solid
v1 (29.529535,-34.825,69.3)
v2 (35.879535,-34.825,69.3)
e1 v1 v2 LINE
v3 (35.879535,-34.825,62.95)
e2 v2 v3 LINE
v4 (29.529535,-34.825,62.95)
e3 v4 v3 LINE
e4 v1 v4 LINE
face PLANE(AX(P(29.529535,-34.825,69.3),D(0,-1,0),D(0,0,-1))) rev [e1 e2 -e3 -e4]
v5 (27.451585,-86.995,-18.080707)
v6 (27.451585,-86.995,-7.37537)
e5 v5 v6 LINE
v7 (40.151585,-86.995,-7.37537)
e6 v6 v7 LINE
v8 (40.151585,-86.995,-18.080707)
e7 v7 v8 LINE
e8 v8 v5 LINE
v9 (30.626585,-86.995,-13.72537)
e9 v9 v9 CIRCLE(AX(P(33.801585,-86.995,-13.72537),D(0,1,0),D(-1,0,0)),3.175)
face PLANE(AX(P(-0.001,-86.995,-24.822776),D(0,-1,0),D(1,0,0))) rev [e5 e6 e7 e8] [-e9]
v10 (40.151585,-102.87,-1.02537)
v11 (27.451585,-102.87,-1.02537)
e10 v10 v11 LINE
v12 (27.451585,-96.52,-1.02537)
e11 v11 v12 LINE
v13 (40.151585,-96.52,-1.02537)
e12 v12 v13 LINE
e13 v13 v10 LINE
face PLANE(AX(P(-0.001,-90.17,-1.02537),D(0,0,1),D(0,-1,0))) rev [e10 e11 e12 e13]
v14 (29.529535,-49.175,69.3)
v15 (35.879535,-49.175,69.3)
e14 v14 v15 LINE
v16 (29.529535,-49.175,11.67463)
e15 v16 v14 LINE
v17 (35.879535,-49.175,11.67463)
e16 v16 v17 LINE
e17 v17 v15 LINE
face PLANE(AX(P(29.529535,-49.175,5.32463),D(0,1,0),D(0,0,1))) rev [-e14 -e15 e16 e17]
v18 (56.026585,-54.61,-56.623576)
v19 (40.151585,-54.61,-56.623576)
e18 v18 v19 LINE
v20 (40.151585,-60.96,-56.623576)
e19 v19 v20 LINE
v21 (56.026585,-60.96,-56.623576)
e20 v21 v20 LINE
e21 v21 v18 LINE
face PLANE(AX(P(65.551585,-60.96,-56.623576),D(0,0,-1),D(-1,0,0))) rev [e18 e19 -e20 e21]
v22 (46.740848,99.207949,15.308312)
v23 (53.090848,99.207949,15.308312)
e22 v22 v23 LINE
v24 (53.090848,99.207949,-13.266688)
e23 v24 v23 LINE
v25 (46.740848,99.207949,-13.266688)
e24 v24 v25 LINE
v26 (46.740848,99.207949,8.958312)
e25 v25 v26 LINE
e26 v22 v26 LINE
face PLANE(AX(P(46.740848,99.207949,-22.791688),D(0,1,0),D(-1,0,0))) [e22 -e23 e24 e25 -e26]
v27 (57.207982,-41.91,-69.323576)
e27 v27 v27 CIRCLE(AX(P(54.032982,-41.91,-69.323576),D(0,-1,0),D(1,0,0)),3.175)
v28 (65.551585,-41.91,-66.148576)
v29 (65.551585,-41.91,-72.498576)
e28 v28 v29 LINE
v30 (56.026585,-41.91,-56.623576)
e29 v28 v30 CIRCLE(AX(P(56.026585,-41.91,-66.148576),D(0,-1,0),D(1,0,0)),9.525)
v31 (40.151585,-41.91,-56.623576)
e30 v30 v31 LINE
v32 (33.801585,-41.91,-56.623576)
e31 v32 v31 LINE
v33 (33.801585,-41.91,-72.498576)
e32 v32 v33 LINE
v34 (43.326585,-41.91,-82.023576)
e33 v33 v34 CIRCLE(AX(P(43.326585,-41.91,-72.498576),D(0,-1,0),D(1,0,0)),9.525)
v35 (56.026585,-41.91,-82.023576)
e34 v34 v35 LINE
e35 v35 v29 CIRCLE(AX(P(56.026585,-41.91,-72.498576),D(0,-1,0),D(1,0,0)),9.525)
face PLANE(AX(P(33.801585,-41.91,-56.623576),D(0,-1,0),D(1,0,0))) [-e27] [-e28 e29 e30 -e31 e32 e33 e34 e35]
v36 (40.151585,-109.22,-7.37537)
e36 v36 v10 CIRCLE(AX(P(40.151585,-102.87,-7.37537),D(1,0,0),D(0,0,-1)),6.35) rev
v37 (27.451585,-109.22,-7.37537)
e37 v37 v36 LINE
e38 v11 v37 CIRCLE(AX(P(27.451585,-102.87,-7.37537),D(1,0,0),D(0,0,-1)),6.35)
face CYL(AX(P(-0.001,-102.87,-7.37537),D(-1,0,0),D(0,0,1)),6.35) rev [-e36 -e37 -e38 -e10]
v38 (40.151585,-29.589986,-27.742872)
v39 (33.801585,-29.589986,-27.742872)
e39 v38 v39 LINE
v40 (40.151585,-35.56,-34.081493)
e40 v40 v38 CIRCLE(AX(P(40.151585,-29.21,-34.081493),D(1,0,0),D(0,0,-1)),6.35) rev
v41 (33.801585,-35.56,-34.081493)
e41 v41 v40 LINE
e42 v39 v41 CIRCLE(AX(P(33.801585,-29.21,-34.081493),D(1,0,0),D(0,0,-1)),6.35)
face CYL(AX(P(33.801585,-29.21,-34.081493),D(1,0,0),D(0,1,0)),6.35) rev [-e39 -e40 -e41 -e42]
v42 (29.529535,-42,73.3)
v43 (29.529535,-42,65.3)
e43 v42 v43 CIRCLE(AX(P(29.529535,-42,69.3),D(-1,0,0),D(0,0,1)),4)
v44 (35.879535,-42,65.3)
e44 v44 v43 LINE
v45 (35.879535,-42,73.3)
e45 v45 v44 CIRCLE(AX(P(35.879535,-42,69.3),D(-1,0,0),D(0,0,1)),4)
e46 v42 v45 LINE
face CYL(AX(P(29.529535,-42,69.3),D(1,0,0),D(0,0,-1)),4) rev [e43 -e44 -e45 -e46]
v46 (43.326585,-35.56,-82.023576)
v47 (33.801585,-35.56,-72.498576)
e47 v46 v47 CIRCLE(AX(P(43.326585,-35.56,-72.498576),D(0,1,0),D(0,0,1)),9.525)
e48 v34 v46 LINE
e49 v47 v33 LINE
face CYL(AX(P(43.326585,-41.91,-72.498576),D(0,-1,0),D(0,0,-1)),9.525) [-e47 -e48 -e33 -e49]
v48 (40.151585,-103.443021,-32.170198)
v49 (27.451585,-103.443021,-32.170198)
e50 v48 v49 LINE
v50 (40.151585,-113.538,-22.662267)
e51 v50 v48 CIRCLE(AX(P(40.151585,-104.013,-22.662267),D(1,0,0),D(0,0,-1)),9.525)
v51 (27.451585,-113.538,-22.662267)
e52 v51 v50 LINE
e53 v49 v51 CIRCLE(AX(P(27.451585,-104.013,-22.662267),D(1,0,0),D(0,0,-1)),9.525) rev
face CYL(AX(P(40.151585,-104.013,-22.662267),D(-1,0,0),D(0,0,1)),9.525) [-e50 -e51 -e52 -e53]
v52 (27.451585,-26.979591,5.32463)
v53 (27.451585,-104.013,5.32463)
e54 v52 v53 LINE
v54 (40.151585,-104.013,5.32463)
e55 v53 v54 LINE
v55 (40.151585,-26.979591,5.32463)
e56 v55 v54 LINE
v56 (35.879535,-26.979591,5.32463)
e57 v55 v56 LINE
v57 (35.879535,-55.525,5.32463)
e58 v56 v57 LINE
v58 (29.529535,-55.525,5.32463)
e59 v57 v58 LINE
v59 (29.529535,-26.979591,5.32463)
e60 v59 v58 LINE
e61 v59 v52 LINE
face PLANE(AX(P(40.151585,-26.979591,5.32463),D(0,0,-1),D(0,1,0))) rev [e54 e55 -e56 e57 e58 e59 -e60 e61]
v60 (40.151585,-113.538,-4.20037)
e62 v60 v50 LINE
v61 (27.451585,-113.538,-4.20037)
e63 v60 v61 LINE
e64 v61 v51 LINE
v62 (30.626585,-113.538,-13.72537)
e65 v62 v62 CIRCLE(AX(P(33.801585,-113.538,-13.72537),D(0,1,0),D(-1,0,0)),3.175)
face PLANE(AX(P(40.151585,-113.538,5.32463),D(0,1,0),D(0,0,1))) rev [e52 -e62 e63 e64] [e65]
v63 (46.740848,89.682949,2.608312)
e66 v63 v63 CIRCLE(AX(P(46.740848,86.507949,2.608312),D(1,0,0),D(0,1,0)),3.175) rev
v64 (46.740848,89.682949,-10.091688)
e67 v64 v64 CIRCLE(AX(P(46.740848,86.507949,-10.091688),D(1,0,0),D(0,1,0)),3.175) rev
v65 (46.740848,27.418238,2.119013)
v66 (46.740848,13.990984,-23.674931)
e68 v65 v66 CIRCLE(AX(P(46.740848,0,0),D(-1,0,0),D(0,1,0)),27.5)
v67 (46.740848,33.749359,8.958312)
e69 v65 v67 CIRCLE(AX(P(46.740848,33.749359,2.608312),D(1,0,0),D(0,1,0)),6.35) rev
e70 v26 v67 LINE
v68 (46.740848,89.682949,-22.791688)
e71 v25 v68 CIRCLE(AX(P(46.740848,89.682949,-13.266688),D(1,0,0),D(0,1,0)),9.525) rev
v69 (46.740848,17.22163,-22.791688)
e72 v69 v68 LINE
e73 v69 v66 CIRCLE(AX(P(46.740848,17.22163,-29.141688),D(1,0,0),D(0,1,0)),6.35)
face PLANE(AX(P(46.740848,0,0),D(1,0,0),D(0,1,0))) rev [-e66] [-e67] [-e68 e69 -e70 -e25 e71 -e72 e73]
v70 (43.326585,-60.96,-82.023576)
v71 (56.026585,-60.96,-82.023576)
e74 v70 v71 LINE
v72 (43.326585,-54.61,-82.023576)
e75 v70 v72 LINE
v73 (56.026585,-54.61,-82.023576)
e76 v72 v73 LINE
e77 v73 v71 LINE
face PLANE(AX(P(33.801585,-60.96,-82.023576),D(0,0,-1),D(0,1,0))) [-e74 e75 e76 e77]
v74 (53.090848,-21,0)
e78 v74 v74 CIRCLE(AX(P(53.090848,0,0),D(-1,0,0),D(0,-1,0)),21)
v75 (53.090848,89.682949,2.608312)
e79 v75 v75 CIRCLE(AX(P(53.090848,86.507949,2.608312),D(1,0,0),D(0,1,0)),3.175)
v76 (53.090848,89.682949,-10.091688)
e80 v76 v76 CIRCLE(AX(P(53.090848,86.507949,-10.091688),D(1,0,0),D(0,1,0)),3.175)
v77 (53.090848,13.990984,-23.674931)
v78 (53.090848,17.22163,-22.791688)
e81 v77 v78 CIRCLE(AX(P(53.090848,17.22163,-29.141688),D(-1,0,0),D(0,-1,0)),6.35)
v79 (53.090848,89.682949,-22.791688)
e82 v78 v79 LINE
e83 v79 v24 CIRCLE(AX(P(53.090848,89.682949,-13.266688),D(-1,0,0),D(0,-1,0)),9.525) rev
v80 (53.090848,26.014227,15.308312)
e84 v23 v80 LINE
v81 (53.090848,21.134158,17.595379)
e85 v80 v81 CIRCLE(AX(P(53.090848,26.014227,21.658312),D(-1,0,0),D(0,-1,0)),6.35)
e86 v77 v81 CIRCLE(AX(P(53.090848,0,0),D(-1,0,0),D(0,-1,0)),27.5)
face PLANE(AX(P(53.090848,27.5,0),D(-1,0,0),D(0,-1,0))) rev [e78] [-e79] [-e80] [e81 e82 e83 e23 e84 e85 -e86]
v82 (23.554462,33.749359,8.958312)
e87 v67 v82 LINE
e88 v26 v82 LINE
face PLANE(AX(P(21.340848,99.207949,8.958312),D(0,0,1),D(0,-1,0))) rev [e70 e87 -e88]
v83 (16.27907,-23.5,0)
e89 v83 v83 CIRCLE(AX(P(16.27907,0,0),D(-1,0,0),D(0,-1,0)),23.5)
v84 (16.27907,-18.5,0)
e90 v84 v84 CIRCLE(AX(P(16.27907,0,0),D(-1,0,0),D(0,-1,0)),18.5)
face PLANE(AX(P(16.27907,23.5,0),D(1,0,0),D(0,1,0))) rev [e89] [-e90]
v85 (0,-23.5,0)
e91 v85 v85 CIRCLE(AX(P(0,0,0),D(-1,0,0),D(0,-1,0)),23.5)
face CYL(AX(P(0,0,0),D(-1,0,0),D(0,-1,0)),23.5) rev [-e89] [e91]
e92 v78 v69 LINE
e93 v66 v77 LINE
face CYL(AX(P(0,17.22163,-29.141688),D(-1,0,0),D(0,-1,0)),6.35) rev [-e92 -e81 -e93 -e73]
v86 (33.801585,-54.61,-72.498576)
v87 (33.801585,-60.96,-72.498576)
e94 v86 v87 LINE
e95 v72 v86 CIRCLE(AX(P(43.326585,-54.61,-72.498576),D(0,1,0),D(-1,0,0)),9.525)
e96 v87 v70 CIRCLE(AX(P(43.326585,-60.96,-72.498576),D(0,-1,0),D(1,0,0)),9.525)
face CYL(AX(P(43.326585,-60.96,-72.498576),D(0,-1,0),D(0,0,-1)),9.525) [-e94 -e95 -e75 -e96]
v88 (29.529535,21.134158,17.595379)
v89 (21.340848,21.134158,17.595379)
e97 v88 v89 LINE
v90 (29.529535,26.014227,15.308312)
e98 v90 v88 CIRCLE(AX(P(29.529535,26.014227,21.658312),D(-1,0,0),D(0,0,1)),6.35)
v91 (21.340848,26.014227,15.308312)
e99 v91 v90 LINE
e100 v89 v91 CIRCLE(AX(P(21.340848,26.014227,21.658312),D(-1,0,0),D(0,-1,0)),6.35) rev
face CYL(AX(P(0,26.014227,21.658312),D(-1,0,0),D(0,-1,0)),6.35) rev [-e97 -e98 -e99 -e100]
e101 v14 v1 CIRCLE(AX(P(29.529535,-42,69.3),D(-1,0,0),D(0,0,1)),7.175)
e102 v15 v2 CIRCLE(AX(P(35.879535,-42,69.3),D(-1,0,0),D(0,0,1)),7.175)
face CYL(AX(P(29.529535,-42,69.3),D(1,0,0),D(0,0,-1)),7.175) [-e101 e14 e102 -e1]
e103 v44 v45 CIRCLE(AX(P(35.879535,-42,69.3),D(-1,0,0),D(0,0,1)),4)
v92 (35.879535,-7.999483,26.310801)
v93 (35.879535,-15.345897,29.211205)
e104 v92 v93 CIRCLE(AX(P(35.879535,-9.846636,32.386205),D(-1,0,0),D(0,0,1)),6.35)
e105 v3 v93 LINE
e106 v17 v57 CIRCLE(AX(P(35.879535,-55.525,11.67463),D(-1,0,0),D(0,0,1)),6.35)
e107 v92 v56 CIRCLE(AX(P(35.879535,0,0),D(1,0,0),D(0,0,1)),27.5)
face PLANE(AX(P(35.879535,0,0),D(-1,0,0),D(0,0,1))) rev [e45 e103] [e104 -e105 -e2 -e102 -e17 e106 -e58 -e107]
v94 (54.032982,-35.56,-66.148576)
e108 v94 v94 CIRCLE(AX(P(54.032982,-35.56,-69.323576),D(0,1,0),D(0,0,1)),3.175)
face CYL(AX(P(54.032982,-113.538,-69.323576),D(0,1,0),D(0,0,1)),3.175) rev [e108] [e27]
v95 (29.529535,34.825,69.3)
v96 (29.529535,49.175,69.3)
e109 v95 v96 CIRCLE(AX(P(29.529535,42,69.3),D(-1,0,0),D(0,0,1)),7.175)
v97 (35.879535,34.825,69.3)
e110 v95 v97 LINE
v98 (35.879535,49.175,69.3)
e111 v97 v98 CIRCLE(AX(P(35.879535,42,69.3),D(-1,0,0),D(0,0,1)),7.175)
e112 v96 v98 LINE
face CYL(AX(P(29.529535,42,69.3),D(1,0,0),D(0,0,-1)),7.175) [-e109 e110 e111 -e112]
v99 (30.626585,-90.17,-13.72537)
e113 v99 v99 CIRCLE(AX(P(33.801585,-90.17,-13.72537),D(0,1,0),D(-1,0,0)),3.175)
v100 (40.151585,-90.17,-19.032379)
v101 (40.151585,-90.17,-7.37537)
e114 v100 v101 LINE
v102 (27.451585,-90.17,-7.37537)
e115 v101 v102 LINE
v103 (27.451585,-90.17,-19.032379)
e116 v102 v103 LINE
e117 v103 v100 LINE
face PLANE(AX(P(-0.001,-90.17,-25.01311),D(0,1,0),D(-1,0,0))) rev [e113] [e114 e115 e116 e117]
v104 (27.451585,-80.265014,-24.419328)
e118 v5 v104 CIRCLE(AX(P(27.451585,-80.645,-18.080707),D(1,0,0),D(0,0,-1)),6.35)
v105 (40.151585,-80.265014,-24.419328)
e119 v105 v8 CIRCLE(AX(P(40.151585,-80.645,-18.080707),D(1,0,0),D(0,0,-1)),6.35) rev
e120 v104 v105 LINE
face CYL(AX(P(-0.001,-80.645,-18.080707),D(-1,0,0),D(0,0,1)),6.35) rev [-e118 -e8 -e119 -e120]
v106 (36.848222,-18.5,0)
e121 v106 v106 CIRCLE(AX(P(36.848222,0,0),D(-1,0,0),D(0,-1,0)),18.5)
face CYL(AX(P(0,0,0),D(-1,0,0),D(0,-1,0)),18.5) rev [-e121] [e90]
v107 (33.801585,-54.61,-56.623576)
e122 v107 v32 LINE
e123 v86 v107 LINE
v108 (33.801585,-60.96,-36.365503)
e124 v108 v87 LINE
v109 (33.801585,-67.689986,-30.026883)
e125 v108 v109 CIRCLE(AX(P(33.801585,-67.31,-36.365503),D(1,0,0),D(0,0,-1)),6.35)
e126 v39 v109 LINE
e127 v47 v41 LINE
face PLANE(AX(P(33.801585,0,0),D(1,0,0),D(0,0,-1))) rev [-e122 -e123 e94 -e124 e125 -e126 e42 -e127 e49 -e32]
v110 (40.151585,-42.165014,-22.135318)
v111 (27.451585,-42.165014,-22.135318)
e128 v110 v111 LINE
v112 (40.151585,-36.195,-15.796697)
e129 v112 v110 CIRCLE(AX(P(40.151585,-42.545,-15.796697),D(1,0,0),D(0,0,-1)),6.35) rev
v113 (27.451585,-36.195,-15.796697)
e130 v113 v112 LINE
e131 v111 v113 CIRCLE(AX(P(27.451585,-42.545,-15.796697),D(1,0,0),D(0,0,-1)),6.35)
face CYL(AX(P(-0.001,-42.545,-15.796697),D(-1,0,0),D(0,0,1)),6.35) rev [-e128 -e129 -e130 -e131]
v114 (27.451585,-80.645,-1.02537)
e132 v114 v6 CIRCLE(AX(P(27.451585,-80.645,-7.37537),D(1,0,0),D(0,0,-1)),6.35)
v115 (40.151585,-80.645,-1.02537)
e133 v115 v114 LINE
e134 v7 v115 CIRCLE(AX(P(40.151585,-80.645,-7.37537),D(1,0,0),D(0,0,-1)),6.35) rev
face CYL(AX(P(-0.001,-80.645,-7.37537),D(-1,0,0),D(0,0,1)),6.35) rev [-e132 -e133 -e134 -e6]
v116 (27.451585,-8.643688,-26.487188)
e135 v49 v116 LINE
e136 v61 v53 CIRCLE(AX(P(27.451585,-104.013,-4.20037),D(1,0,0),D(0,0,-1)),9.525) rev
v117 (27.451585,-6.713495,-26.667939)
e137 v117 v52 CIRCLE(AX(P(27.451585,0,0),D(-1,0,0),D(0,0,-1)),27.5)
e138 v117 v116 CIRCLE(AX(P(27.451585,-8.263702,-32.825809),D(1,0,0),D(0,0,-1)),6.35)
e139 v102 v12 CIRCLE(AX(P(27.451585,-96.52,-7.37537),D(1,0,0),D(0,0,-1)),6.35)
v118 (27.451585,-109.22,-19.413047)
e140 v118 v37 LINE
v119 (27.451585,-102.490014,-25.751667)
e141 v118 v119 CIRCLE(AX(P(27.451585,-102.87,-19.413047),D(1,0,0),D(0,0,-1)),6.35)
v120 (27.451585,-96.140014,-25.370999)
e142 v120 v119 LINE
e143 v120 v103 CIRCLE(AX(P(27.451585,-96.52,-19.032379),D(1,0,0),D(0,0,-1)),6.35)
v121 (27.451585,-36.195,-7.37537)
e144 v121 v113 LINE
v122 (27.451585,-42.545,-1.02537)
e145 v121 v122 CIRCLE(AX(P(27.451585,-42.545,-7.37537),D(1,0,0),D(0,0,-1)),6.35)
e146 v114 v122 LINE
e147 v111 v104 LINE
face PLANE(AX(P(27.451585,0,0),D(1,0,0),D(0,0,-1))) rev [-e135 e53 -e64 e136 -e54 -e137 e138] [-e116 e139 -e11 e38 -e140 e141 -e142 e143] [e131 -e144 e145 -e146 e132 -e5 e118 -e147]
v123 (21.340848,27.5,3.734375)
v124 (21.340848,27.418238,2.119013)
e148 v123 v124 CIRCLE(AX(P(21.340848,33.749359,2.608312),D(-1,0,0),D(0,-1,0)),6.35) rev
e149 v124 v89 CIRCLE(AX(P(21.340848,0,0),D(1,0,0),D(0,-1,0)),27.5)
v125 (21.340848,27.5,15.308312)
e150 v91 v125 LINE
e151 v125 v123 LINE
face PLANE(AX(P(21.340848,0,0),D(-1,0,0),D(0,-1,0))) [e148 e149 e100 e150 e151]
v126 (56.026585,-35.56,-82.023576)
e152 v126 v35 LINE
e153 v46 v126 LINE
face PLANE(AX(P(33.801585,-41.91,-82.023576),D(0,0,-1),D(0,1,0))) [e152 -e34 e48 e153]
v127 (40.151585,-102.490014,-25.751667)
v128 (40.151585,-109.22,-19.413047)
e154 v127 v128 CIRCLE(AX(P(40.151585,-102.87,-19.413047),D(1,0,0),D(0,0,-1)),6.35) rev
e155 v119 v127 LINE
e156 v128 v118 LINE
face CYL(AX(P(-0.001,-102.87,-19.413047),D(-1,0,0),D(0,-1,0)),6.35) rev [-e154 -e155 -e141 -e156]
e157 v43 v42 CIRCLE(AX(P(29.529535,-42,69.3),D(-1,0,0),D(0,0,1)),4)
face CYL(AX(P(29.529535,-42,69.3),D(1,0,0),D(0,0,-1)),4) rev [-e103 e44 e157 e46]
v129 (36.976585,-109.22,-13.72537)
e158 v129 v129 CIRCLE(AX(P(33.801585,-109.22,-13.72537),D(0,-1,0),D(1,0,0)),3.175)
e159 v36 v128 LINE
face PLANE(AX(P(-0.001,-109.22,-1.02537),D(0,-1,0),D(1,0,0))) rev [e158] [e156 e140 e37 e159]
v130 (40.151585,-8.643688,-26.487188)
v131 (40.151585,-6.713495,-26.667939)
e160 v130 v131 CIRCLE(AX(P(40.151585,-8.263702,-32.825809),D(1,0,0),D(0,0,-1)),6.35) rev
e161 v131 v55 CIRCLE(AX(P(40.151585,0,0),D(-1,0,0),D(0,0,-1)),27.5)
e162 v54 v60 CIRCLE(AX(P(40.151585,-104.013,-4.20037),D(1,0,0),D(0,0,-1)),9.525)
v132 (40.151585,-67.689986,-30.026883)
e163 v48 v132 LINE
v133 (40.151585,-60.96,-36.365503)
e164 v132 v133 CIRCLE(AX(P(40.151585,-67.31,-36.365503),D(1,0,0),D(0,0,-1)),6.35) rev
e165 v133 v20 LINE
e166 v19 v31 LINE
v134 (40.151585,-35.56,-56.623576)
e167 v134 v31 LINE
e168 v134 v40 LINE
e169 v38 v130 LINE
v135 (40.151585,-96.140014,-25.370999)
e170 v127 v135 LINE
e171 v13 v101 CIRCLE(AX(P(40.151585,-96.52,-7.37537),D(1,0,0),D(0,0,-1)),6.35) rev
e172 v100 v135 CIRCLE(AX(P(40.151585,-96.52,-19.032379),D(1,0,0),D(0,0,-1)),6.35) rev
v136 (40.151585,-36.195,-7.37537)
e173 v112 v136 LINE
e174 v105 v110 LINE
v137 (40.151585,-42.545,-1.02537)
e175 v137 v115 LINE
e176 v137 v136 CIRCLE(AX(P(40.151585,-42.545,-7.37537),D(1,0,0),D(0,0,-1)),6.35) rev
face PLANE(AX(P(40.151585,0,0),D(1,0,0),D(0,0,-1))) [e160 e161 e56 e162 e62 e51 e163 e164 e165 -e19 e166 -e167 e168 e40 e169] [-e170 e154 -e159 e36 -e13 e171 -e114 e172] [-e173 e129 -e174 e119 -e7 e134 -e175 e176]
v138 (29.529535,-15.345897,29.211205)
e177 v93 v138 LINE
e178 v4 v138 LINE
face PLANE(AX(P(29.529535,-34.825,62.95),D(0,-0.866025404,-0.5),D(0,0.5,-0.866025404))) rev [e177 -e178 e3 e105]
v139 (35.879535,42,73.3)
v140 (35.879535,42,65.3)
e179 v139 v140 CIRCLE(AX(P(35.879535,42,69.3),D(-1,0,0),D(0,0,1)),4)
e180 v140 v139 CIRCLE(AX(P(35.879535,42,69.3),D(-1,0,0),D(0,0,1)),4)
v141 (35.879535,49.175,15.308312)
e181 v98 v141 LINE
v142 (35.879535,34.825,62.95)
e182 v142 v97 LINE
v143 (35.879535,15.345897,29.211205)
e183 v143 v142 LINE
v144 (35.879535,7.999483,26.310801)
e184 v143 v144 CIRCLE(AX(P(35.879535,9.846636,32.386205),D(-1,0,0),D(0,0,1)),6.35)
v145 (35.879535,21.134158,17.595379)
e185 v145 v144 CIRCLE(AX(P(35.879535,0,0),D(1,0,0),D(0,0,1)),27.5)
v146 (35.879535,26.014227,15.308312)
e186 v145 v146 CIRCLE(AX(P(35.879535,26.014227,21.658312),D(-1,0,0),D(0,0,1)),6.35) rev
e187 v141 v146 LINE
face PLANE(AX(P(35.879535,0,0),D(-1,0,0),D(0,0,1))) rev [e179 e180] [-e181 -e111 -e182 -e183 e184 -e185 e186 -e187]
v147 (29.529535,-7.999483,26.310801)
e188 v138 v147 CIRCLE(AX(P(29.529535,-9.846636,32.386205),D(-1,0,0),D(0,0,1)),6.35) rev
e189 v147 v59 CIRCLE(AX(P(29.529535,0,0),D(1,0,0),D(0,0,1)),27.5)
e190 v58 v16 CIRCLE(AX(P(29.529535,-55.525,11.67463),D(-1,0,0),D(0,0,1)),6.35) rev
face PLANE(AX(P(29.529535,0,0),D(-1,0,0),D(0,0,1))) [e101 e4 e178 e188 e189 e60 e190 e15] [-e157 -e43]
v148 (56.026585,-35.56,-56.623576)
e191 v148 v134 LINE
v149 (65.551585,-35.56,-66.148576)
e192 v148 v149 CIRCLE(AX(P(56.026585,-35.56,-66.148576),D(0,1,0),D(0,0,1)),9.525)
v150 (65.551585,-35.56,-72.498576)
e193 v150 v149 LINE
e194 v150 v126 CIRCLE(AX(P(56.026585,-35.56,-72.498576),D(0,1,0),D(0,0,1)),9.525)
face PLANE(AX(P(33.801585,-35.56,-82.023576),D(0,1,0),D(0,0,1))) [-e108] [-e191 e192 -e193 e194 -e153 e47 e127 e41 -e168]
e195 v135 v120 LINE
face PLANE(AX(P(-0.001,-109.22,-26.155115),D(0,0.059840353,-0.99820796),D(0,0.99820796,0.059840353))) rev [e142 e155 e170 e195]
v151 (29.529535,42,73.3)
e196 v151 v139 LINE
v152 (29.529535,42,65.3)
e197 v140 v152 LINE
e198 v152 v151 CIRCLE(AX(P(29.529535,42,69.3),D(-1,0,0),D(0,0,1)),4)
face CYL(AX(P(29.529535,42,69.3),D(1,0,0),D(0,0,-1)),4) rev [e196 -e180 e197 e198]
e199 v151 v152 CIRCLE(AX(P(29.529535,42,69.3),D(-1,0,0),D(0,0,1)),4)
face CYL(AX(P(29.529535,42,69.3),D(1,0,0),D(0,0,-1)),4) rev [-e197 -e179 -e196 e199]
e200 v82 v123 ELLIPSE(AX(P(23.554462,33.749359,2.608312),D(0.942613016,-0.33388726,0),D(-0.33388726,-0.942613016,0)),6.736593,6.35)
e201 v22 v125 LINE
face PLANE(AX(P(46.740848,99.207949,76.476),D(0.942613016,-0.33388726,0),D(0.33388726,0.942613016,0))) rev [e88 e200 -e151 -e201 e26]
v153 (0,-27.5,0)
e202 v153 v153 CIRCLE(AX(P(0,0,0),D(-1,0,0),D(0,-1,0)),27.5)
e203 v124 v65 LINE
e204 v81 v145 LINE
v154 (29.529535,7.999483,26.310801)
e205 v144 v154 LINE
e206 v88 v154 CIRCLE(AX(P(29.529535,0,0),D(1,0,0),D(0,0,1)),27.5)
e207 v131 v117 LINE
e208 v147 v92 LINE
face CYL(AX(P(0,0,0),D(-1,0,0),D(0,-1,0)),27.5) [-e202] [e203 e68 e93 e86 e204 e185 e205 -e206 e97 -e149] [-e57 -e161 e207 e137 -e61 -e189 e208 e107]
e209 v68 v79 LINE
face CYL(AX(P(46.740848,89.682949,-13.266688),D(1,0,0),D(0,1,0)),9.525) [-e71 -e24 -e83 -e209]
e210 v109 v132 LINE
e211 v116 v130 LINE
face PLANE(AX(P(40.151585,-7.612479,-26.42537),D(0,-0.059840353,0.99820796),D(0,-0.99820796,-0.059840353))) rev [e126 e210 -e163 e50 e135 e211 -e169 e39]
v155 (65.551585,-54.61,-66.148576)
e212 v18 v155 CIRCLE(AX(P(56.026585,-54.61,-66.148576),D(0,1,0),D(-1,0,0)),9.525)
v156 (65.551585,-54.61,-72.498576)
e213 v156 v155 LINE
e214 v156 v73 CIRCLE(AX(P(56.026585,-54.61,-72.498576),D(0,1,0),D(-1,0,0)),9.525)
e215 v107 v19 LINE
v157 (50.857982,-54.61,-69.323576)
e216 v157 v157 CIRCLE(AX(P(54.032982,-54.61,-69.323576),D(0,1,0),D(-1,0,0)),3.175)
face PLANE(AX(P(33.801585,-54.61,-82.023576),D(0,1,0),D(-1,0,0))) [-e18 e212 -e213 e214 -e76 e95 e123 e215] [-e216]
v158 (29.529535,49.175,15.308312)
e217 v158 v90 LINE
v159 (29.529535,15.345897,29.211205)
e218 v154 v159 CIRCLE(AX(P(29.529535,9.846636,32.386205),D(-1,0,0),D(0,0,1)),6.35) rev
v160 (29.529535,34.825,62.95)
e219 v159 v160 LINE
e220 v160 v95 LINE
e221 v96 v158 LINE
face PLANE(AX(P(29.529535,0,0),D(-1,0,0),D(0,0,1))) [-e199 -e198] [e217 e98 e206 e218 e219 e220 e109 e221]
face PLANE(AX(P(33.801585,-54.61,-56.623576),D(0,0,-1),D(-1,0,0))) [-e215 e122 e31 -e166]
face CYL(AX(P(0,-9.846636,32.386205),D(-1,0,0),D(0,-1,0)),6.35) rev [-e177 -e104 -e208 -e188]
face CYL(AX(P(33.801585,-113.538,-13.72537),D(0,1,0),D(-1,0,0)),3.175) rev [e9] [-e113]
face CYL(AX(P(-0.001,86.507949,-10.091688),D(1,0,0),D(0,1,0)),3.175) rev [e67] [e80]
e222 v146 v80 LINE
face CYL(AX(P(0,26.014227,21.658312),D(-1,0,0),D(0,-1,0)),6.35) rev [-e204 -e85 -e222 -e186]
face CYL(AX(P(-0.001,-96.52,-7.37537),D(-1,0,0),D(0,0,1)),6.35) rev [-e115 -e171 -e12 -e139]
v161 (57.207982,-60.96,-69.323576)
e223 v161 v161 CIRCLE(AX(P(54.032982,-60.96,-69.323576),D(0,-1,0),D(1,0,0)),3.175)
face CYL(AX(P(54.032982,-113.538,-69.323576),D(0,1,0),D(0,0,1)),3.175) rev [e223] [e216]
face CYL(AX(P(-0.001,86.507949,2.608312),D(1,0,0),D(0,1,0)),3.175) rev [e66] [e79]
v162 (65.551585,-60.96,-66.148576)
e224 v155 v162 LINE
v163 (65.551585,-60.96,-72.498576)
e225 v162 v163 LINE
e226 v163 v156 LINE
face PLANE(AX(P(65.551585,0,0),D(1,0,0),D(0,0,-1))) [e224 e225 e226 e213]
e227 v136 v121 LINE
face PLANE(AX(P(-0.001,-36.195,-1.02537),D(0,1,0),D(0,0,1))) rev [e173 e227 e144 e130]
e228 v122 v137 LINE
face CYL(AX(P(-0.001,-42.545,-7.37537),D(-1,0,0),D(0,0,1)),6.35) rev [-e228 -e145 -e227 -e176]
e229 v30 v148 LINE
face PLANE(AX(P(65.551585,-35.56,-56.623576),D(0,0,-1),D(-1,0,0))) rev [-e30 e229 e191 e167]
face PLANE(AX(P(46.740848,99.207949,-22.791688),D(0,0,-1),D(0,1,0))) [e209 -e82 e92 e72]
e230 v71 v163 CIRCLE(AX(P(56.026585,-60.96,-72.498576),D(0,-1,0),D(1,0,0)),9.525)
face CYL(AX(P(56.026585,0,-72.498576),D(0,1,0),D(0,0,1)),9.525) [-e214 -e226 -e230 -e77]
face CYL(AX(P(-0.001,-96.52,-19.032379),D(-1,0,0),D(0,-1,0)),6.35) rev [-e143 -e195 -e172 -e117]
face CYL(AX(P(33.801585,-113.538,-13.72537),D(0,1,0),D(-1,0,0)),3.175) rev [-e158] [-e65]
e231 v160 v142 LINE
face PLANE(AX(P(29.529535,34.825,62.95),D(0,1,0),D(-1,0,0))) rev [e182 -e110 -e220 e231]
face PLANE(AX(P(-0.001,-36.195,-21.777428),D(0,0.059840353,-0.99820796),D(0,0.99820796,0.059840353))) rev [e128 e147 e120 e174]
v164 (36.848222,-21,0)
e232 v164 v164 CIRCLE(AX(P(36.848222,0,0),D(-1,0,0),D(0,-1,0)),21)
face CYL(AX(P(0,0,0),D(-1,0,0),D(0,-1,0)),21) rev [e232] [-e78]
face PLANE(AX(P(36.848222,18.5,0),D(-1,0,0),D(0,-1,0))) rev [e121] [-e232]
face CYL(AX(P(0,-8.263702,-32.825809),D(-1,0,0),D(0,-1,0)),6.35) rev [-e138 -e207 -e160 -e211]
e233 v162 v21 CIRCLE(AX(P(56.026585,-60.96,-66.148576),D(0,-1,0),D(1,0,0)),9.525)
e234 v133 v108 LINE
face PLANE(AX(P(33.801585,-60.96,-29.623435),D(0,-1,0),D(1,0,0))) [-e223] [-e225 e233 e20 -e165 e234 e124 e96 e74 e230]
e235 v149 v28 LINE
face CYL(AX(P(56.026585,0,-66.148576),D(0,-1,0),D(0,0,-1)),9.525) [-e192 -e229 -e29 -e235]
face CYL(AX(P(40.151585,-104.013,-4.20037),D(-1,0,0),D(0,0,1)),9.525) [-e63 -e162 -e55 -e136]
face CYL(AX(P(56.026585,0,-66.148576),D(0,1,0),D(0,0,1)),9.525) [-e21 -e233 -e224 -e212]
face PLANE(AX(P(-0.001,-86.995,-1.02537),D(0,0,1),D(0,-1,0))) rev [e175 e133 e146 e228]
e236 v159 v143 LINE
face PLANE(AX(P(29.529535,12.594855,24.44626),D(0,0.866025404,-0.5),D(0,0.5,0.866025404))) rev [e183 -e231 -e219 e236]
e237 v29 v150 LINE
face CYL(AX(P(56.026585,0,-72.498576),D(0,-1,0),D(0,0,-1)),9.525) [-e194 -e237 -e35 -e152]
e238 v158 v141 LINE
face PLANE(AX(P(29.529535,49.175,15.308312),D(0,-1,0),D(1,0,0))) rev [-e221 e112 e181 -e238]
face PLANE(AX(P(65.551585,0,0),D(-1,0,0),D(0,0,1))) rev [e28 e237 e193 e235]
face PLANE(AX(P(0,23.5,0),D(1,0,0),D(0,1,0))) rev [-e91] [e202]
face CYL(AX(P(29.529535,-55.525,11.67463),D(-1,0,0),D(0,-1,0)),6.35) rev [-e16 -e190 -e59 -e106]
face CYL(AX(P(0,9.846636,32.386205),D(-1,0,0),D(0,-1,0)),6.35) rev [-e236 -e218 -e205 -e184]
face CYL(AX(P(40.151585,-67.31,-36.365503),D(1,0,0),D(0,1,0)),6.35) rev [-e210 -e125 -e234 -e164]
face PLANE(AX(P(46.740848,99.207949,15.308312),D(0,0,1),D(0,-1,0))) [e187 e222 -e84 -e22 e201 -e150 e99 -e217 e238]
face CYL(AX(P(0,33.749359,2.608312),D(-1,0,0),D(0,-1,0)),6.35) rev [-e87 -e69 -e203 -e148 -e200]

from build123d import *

# Parameters (mm, degrees)
BOSS_EXTRUDE1_START      = -6.35
BOSS_EXTRUDE1_DEPTH      = 6.35
BOSS_EXTRUDE2_DEPTH      = 6.35
BOSS_EXTRUDE2_DEPTH_BACK = 6.35
BOSS_EXTRUDE3_DEPTH      = 6.35
SKETCH6_W                = 25.4
SKETCH6_H                = 6.35
BOSS_EXTRUDE4_DEPTH      = 25.4
BOSS_EXTRUDE5_START      = 25.4
BOSS_EXTRUDE5_DEPTH      = 25.4
BOSS_EXTRUDE6_START      = 6.35
BOSS_EXTRUDE6_DEPTH      = 6.35
CUT_EXTRUDE1_REACH       = 161.579
CUT_EXTRUDE2_REACH       = 147.708
SKETCH14_R               = 3.175
CUT_EXTRUDE3_DEPTH       = 214.767199478
CUT_EXTRUDE4_REACH       = 151.791
SKETCH15_R               = 3.175
SKETCH16_R               = 3.175
CUT_EXTRUDE5_DEPTH       = 171.84284427
BOSS_EXTRUDE7_START      = 6.35
BOSS_EXTRUDE7_DEPTH      = 6.35
F_0_375_FILLET1_R        = 9.525
F_0_25_FILLET1_R         = 6.35


with BuildPart() as part:
    # Sketch1 → Revolve1 (revolve)
    with BuildSketch(Plane.XY, mode=Mode.PRIVATE) as revolve1_sk:
        Polygon((0, 23.5), (16.279070312, 23.5), (16.279070312, 18.5), (36.848222468, 18.5), (36.848222468, 21), (53.090847844, 21), (53.090847844, 27.5), (0, 27.5), align=None)
    revolve(revolve1_sk.sketch.rotate(Axis((0, 0, 0), (1, 0, 0)), 180), axis=Axis((0, 0, 0), (1, 0, 0)))

    # Sketch2 → Boss-Extrude1 (add)
    with BuildSketch(Plane(origin=(53.090847844, 0, 0), x_dir=(0, 0, -1), z_dir=(1, 0, 0)).offset(BOSS_EXTRUDE1_START)):
        with BuildLine():
            Line((22.791687671, 99.207948957), (22.791687671, 15.387948957))
            ThreePointArc((22.791687671, 15.387948957), (5.282335812, 26.987903371), (-15.308312329, 22.84525276))
            Line((-15.308312329, 22.84525276), (-15.308312329, 99.207948957))
            Line((-15.308312329, 99.207948957), (22.791687671, 99.207948957))
        make_face()
    extrude(amount=BOSS_EXTRUDE1_DEPTH)

    # Sketch4 → Boss-Extrude2 (add, two sides: drawn at the far end of the back side and taken through both)
    with BuildSketch(Plane(origin=(33.801584976, 0, 0), x_dir=(0, 0, -1), z_dir=(1, 0, 0)).offset(-BOSS_EXTRUDE2_DEPTH_BACK)):
        with BuildLine():
            Line((26.425369625, -7.612479241), (32.775369625, -113.538))
            Line((32.775369625, -113.538), (-5.324630375, -113.538))
            Line((-5.324630375, -113.538), (-5.324630375, -26.979590645))
            ThreePointArc((-5.324630375, -26.979590645), (14.320668639, -23.476977015), (26.425369625, -7.612479241))
        make_face()
    extrude(amount=BOSS_EXTRUDE2_DEPTH + BOSS_EXTRUDE2_DEPTH_BACK)

    # Sketch5 → Boss-Extrude3 (add)
    with BuildSketch(Plane(origin=(40.151584976, 0, 0), x_dir=(0, 0, -1), z_dir=(1, 0, 0))):
        Polygon((29.623435156, -60.96), (82.023576364, -60.96), (82.023576364, -54.61), (56.623576364, -54.61), (56.623576364, -41.91), (82.023576364, -41.91), (82.023576364, -35.56), (28.1007615, -35.56), align=None)
    extrude(amount=-BOSS_EXTRUDE3_DEPTH)

    # Sketch6 → Boss-Extrude4 (add)
    with BuildSketch(Plane(origin=(40.151584976, 0, 0), x_dir=(0, 0, -1), z_dir=(1, 0, 0))):
        with Locations((69.323576364, -38.735)):
            Rectangle(SKETCH6_W, SKETCH6_H)
        with Locations((69.323576364, -57.785)):
            Rectangle(SKETCH6_W, SKETCH6_H)
    extrude(amount=BOSS_EXTRUDE4_DEPTH)

    # Sketch7 → Boss-Extrude5 (add)
    with BuildSketch(Plane.ZY.offset(-46.740847844).offset(BOSS_EXTRUDE5_START)):
        with BuildLine():
            Line((15.308312329, 22.84525276), (15.308312329, 99.207948957))
            Line((15.308312329, 99.207948957), (8.958312329, 99.207948957))
            Line((8.958312329, 99.207948957), (8.958312329, 25.99997385))
            ThreePointArc((8.958312329, 25.99997385), (12.235413126, 24.62812753), (15.308312329, 22.84525276))
        make_face()
    extrude(amount=-BOSS_EXTRUDE5_DEPTH)

    # Sketch8 → Boss-Extrude6 (add)
    with BuildSketch(Plane.ZY.offset(-35.879535156).offset(BOSS_EXTRUDE6_START)):
        with BuildLine():
            Line((15.308312329, 49.175), (69.3, 49.175))
            ThreePointArc((69.3, 49.175), (76.475, 42), (69.3, 34.825))
            Line((69.3, 34.825), (62.95, 34.825))
            Line((62.95, 34.825), (24.446259855, 12.594855263))
            ThreePointArc((24.446259855, 12.594855263), (20.527400337, 18.299612985), (15.308312329, 22.84525276))
            Line((15.308312329, 22.84525276), (15.308312329, 49.175))
        make_face()
        with BuildLine():
            ThreePointArc((69.3, 38.000000001), (73.299999999, 42), (69.3, 46.000000001))
            ThreePointArc((69.3, 46.000000001), (65.299999999, 42), (69.3, 38.000000001))
        make_face(mode=Mode.SUBTRACT)
    extrude(amount=-BOSS_EXTRUDE6_DEPTH)

    # Sketch10 → Cut-Extrude1 (cut, up to next)
    with BuildSketch(Plane(origin=(0, 0, 8.958312329), x_dir=(-1, 0, 0), z_dir=(0, 0, -1)), mode=Mode.PRIVATE) as cut_extrude1_sk1:
        Polygon((-46.740847844, 99.207948957), (-21.340847844, 27.5), (-21.340847844, 99.207948957), align=None)
    cut_extrude1_tool1 = extrude(cut_extrude1_sk1.sketch, amount=-CUT_EXTRUDE1_REACH, mode=Mode.PRIVATE) & part.part
    add(cut_extrude1_tool1.solids().sort_by_distance((29.807515, 75.305299, 8.958312))[0], mode=Mode.SUBTRACT)

    # Sketch13 → Cut-Extrude2 (cut, up to next)
    with BuildSketch(Plane(origin=(40.151584976, 0, 0), x_dir=(0, 0, -1), z_dir=(1, 0, 0)), mode=Mode.PRIVATE) as cut_extrude2_sk1:
        Polygon((26.155115223, -109.22), (25.01310998, -90.17), (1.025369625, -90.17), (1.025369625, -109.22), align=None)
    cut_extrude2_tool1 = extrude(cut_extrude2_sk1.sketch, amount=-CUT_EXTRUDE2_REACH, mode=Mode.PRIVATE) & part.part
    # Sketch13 → Cut-Extrude2 (cut, up to next)
    with BuildSketch(Plane(origin=(40.151584976, 0, 0), x_dir=(0, 0, -1), z_dir=(1, 0, 0)), mode=Mode.PRIVATE) as cut_extrude2_sk2:
        Polygon((21.77742846, -36.195), (24.822775773, -86.995), (1.025369625, -86.995), (1.025369625, -36.195), align=None)
    cut_extrude2_tool2 = extrude(cut_extrude2_sk2.sketch, amount=-CUT_EXTRUDE2_REACH, mode=Mode.PRIVATE) & part.part
    add(cut_extrude2_tool1.solids().sort_by_distance((40.151585, -99.76882, -13.306954))[0], mode=Mode.SUBTRACT)
    add(cut_extrude2_tool2.solids().sort_by_distance((40.151585, -62.173771, -12.180084))[0], mode=Mode.SUBTRACT)

    # Sketch14 → Cut-Extrude3 (cut, through all)
    with BuildSketch(Plane(origin=(0, -86.995, 0), x_dir=(1, 0, 0), z_dir=(0, 1, 0))):
        with Locations(Location((33.801584976, 13.725369625, 0), (0, 0, 180))):
            Circle(SKETCH14_R)
    extrude(amount=-CUT_EXTRUDE3_DEPTH, mode=Mode.SUBTRACT)

    # Sketch15 → Cut-Extrude4 (cut, up to next)
    with BuildSketch(Plane(origin=(53.090847844, 0, 0), x_dir=(0, 0, -1), z_dir=(1, 0, 0)), mode=Mode.PRIVATE) as cut_extrude4_sk1:
        with Locations(Location((-2.608312329, 86.507948957, 0), (0, 0, 90))):
            Circle(SKETCH15_R)
    cut_extrude4_tool1 = extrude(cut_extrude4_sk1.sketch, amount=-CUT_EXTRUDE4_REACH, mode=Mode.PRIVATE) & part.part
    # Sketch15 → Cut-Extrude4 (cut, up to next)
    with BuildSketch(Plane(origin=(53.090847844, 0, 0), x_dir=(0, 0, -1), z_dir=(1, 0, 0)), mode=Mode.PRIVATE) as cut_extrude4_sk2:
        with Locations(Location((10.091687671, 86.507948957, 0), (0, 0, 90))):
            Circle(SKETCH15_R)
    cut_extrude4_tool2 = extrude(cut_extrude4_sk2.sketch, amount=-CUT_EXTRUDE4_REACH, mode=Mode.PRIVATE) & part.part
    add(cut_extrude4_tool1.solids().sort_by_distance((53.090848, 86.507949, 2.608312))[0], mode=Mode.SUBTRACT)
    add(cut_extrude4_tool2.solids().sort_by_distance((53.090848, 86.507949, -10.091688))[0], mode=Mode.SUBTRACT)

    # Sketch16 → Cut-Extrude5 (cut, through all)
    with BuildSketch(Plane(origin=(0, -35.56, 0), x_dir=(1, 0, 0), z_dir=(0, 1, 0))):
        with Locations(Location((54.032981596, 69.323576364, 0), (0, 0, 180))):
            Circle(SKETCH16_R)
    extrude(amount=-CUT_EXTRUDE5_DEPTH, mode=Mode.SUBTRACT)

    # Sketch9 → Boss-Extrude7 (add)
    with BuildSketch(Plane.ZY.offset(-35.879535156).offset(BOSS_EXTRUDE7_START)):
        with BuildLine():
            Line((5.324630375, -49.174999998), (69.3, -49.174999998))
            ThreePointArc((69.3, -49.174999998), (76.474999998, -42), (69.3, -34.825000002))
            Line((69.3, -34.825000002), (62.95, -34.825000002))
            Line((62.95, -34.825000002), (24.446259854, -12.594855264))
            ThreePointArc((24.446259854, -12.594855264), (16.531988061, -21.975972578), (5.324630375, -26.979590645))
            Line((5.324630375, -26.979590645), (5.324630375, -49.174999998))
        make_face()
        with BuildLine():
            ThreePointArc((69.3, -46.000000001), (73.300000001, -42), (69.3, -38.000000001))
            ThreePointArc((69.3, -38.000000001), (65.300000001, -42), (69.3, -46.000000001))
        make_face(mode=Mode.SUBTRACT)
    extrude(amount=-BOSS_EXTRUDE7_DEPTH)

    # 0.375 Fillet1
    f_0_375_fillet1_edges = [part.edges().sort_by_distance(p)[0] for p in [
        (49.915847844, 99.207948957, -22.791687671),
        (33.801584976, -113.538, 5.324630375),
        (33.801584976, -113.538, -32.775369625),
        (33.801584976, -38.735, -82.023576364),
        (33.801584976, -57.785, -82.023576364),
        (65.551584976, -38.735, -82.023576364),
        (65.551584976, -38.735, -56.623576364),
        (65.551584976, -57.785, -82.023576364),
        (65.551584976, -57.785, -56.623576364),
    ]]
    fillet(f_0_375_fillet1_edges, radius=F_0_375_FILLET1_R)

    # 0.25 Fillet1
    # the kernel refuses this fillet: 6.35 mm, written as the material it adds along each edge
    with BuildSketch(Plane(origin=(40.151584976, -60.96, -29.623435156), x_dir=(0, -0.9982079603765488, -0.05984035294757458), z_dir=(-1, 0, 0))) as f_0_25_fillet1_piece_1:
        with BuildLine():
            CenterArc((F_0_25_FILLET1_R * 1.06174303854, -F_0_25_FILLET1_R), F_0_25_FILLET1_R, 90, 93.4306492)
            Line((F_0_25_FILLET1_R * 0.063535078166, -F_0_25_FILLET1_R * 1.05984035295), (0, 0))
            Line((0, 0), (F_0_25_FILLET1_R * 1.06174303854, 0))
        make_face()
    extrude(amount=6.35)
    with BuildSketch(Plane(origin=(40.151584976, -35.56, -28.1007615), x_dir=(0, 0.9982079603765489, 0.05984035294757479), z_dir=(-1, 0, 0))) as f_0_25_fillet1_piece_2:
        with BuildLine():
            CenterArc((F_0_25_FILLET1_R * 0.941847475047, F_0_25_FILLET1_R), F_0_25_FILLET1_R, 183.4306492, 86.5693508)
            Line((-F_0_25_FILLET1_R * 0.0563604853296, F_0_25_FILLET1_R * 0.940159647052), (0, 0))
            Line((0, 0), (F_0_25_FILLET1_R * 0.941847475047, 0))
        make_face()
    extrude(amount=6.35)
    with BuildSketch(Plane(origin=(21.340847844, 25.99997385, 8.958312329), x_dir=(0, 0.20304997506833786, -0.9791683755232026), z_dir=(1, 0, 0))) as f_0_25_fillet1_piece_3_section:
        with BuildLine():
            CenterArc((7.791231567, 6.298585148), F_0_25_FILLET1_R, 168.284629793, 94.419307905)
            Line((1.573512383, 7.587952489), (0, 0))
            ThreePointArc((0, 0), (3.492402088, 0.222662746), (6.984804176, 0))
        make_face()
    f_0_25_fillet1_piece_3 = extrude(amount=25.4, mode=Mode.PRIVATE)
    f_0_25_fillet1_piece_3 = split(f_0_25_fillet1_piece_3, bisect_by=Plane(origin=(23.013997024, 32.223547088, 7.374495309), z_dir=(0.9426130158079032, -0.33388726005873554, 0)), keep=Keep.TOP, mode=Mode.PRIVATE)
    add(f_0_25_fillet1_piece_3)
    with BuildSketch(Plane(origin=(27.451584976, -7.612479241, -26.425369625), x_dir=(0, 0.9654712583471962, -0.26050959541921204), z_dir=(1, 0, 0))) as f_0_25_fillet1_piece_4:
        with BuildLine():
            CenterArc((1.038638906, -6.34908993), F_0_25_FILLET1_R, 90.970048392, 17.560902681)
            Line((-0.979498363, -0.328324035), (0, 0))
            ThreePointArc((0, 0), (0.465567562, -0.003941249), (0.931135124, 0))
        make_face()
    extrude(amount=12.7)
    with BuildSketch(Plane(origin=(46.740847844, 15.387948957, -22.791687671), x_dir=(0, 1, 0), z_dir=(1, 0, 0))) as f_0_25_fillet1_piece_5:
        with BuildLine():
            CenterArc((1.833681038, -6.35), F_0_25_FILLET1_R, 90, 30.581473676)
            ThreePointArc((-1.396964471, -0.883243229), (-0.691845316, -0.452118768), (0, 0))
            Line((0, 0), (1.833681038, 0))
        make_face()
    extrude(amount=6.35)
    with BuildSketch(Plane(origin=(53.090847844, 22.84525276, 15.308312329), x_dir=(0, -0.5990573223008322, 0.8007061412264532), z_dir=(-1, 0, 0))) as f_0_25_fillet1_piece_6:
        with BuildLine():
            CenterArc((3.186086766, 6.341431143), F_0_25_FILLET1_R, 216.80241312, 50.220708616)
            Line((-1.898397231, 2.537417146), (0, 0))
            ThreePointArc((0, 0), (1.428156252, 0.037109225), (2.856312504, 0))
        make_face()
    extrude(amount=25.133748321)
    with BuildSketch(Plane(origin=(37.451970789, 22.84525276, 15.308312329), x_dir=(0, -0.5990573223008359, 0.8007061412264505), z_dir=(-1, 0, 0))) as f_0_25_fillet1_piece_7:
        with BuildLine():
            CenterArc((3.186086766, 6.341431143), F_0_25_FILLET1_R, 216.80241312, 50.220708616)
            Line((-1.898397231, 2.537417146), (0, 0))
            ThreePointArc((0, 0), (1.428156252, 0.037109225), (2.856312504, 0))
        make_face()
    extrude(amount=16.111122945)
    with BuildSketch(Plane(origin=(29.529535156, 12.594855263, 24.446259855), x_dir=(0, -0.9266302092337214, 0.3759740088562898), z_dir=(1, 0, 0))) as f_0_25_fillet1_piece_8:
        with BuildLine():
            CenterArc((5.531795752, -6.32413382), F_0_25_FILLET1_R, 95.173261718, 76.911263608)
            Line((-0.757703388, -5.449662227), (0, 0))
            ThreePointArc((0, 0), (2.479615048, -0.112018891), (4.959230096, 0))
        make_face()
    extrude(amount=6.35)
    with BuildSketch(Plane(origin=(29.529535156, -12.594855264, 24.446259854), x_dir=(0, 0.9266302092084975, 0.3759740089184572), z_dir=(1, 0, 0))) as f_0_25_fillet1_piece_9:
        with BuildLine():
            CenterArc((5.531795753, 6.32413382), F_0_25_FILLET1_R, 187.91547467, 76.911263612)
            Line((-0.757703387, 5.449662228), (0, 0))
            ThreePointArc((0, 0), (2.479615048, 0.112018891), (4.959230096, 0))
        make_face()
    extrude(amount=6.35)
    with BuildSketch(Plane(origin=(29.529535156, -49.174999998, 5.324630375), x_dir=(0, -1, 0), z_dir=(1, 0, 0))) as f_0_25_fillet1_piece_10:
        with BuildLine():
            CenterArc((F_0_25_FILLET1_R, -F_0_25_FILLET1_R), F_0_25_FILLET1_R, 90, 90)
            Line((0, -F_0_25_FILLET1_R), (0, 0))
            Line((0, 0), (F_0_25_FILLET1_R, 0))
        make_face()
    extrude(amount=6.35)
    with BuildSketch(Plane(origin=(40.151584976, -36.195, -1.025369625), x_dir=(0, -1, 0), z_dir=(-1, 0, 0)), Plane(origin=(40.151584976, -86.995, -1.025369625), x_dir=(0, 0, -1), z_dir=(-1, 0, 0)), Plane(origin=(40.151584976, -109.22, -1.025369625), x_dir=(0, 0, -1), z_dir=(-1, 0, 0)), Plane(origin=(40.151584976, -90.17, -1.025369625), x_dir=(0, -1, 0), z_dir=(-1, 0, 0))) as f_0_25_fillet1_piece_11:
        with BuildLine():
            CenterArc((F_0_25_FILLET1_R, -F_0_25_FILLET1_R), F_0_25_FILLET1_R, 90, 90)
            Line((0, -F_0_25_FILLET1_R), (0, 0))
            Line((0, 0), (F_0_25_FILLET1_R, 0))
        make_face()
    extrude(amount=12.7)
    with BuildSketch(Plane(origin=(40.151584976, -36.195, -21.77742846), x_dir=(0, -0.9982079603765489, -0.05984035294757416), z_dir=(-1, 0, 0))) as f_0_25_fillet1_piece_12:
        with BuildLine():
            CenterArc((F_0_25_FILLET1_R * 0.941847475047, F_0_25_FILLET1_R), F_0_25_FILLET1_R, 183.4306492, 86.5693508)
            Line((-F_0_25_FILLET1_R * 0.0563604853296, F_0_25_FILLET1_R * 0.940159647052), (0, 0))
            Line((0, 0), (F_0_25_FILLET1_R * 0.941847475047, 0))
        make_face()
    extrude(amount=12.7)
    with BuildSketch(Plane(origin=(40.151584976, -86.995, -24.822775773), x_dir=(0, 0.9982079603765488, 0.05984035294757458), z_dir=(-1, 0, 0))) as f_0_25_fillet1_piece_13:
        with BuildLine():
            CenterArc((F_0_25_FILLET1_R * 1.06174303854, -F_0_25_FILLET1_R), F_0_25_FILLET1_R, 90, 93.4306492)
            Line((F_0_25_FILLET1_R * 0.063535078166, -F_0_25_FILLET1_R * 1.05984035295), (0, 0))
            Line((0, 0), (F_0_25_FILLET1_R * 1.06174303854, 0))
        make_face()
    extrude(amount=12.7)
    with BuildSketch(Plane(origin=(40.151584976, -109.22, -26.155115223), x_dir=(0, 0, 1), z_dir=(-1, 0, 0))) as f_0_25_fillet1_piece_14:
        with BuildLine():
            CenterArc((F_0_25_FILLET1_R * 1.06174303854, F_0_25_FILLET1_R), F_0_25_FILLET1_R, 176.5693508, 93.4306492)
            Line((F_0_25_FILLET1_R * 0.063535078166, F_0_25_FILLET1_R * 1.05984035295), (0, 0))
            Line((0, 0), (F_0_25_FILLET1_R * 1.06174303854, 0))
        make_face()
    extrude(amount=12.7)
    with BuildSketch(Plane(origin=(40.151584976, -90.17, -25.01310998), x_dir=(0, 0, 1), z_dir=(-1, 0, 0))) as f_0_25_fillet1_piece_15:
        with BuildLine():
            CenterArc((F_0_25_FILLET1_R * 0.941847475047, -F_0_25_FILLET1_R), F_0_25_FILLET1_R, 90, 86.5693508)
            Line((-F_0_25_FILLET1_R * 0.0563604853296, -F_0_25_FILLET1_R * 0.940159647052), (0, 0))
            Line((0, 0), (F_0_25_FILLET1_R * 0.941847475047, 0))
        make_face()
    extrude(amount=12.7)


solid = part.part
